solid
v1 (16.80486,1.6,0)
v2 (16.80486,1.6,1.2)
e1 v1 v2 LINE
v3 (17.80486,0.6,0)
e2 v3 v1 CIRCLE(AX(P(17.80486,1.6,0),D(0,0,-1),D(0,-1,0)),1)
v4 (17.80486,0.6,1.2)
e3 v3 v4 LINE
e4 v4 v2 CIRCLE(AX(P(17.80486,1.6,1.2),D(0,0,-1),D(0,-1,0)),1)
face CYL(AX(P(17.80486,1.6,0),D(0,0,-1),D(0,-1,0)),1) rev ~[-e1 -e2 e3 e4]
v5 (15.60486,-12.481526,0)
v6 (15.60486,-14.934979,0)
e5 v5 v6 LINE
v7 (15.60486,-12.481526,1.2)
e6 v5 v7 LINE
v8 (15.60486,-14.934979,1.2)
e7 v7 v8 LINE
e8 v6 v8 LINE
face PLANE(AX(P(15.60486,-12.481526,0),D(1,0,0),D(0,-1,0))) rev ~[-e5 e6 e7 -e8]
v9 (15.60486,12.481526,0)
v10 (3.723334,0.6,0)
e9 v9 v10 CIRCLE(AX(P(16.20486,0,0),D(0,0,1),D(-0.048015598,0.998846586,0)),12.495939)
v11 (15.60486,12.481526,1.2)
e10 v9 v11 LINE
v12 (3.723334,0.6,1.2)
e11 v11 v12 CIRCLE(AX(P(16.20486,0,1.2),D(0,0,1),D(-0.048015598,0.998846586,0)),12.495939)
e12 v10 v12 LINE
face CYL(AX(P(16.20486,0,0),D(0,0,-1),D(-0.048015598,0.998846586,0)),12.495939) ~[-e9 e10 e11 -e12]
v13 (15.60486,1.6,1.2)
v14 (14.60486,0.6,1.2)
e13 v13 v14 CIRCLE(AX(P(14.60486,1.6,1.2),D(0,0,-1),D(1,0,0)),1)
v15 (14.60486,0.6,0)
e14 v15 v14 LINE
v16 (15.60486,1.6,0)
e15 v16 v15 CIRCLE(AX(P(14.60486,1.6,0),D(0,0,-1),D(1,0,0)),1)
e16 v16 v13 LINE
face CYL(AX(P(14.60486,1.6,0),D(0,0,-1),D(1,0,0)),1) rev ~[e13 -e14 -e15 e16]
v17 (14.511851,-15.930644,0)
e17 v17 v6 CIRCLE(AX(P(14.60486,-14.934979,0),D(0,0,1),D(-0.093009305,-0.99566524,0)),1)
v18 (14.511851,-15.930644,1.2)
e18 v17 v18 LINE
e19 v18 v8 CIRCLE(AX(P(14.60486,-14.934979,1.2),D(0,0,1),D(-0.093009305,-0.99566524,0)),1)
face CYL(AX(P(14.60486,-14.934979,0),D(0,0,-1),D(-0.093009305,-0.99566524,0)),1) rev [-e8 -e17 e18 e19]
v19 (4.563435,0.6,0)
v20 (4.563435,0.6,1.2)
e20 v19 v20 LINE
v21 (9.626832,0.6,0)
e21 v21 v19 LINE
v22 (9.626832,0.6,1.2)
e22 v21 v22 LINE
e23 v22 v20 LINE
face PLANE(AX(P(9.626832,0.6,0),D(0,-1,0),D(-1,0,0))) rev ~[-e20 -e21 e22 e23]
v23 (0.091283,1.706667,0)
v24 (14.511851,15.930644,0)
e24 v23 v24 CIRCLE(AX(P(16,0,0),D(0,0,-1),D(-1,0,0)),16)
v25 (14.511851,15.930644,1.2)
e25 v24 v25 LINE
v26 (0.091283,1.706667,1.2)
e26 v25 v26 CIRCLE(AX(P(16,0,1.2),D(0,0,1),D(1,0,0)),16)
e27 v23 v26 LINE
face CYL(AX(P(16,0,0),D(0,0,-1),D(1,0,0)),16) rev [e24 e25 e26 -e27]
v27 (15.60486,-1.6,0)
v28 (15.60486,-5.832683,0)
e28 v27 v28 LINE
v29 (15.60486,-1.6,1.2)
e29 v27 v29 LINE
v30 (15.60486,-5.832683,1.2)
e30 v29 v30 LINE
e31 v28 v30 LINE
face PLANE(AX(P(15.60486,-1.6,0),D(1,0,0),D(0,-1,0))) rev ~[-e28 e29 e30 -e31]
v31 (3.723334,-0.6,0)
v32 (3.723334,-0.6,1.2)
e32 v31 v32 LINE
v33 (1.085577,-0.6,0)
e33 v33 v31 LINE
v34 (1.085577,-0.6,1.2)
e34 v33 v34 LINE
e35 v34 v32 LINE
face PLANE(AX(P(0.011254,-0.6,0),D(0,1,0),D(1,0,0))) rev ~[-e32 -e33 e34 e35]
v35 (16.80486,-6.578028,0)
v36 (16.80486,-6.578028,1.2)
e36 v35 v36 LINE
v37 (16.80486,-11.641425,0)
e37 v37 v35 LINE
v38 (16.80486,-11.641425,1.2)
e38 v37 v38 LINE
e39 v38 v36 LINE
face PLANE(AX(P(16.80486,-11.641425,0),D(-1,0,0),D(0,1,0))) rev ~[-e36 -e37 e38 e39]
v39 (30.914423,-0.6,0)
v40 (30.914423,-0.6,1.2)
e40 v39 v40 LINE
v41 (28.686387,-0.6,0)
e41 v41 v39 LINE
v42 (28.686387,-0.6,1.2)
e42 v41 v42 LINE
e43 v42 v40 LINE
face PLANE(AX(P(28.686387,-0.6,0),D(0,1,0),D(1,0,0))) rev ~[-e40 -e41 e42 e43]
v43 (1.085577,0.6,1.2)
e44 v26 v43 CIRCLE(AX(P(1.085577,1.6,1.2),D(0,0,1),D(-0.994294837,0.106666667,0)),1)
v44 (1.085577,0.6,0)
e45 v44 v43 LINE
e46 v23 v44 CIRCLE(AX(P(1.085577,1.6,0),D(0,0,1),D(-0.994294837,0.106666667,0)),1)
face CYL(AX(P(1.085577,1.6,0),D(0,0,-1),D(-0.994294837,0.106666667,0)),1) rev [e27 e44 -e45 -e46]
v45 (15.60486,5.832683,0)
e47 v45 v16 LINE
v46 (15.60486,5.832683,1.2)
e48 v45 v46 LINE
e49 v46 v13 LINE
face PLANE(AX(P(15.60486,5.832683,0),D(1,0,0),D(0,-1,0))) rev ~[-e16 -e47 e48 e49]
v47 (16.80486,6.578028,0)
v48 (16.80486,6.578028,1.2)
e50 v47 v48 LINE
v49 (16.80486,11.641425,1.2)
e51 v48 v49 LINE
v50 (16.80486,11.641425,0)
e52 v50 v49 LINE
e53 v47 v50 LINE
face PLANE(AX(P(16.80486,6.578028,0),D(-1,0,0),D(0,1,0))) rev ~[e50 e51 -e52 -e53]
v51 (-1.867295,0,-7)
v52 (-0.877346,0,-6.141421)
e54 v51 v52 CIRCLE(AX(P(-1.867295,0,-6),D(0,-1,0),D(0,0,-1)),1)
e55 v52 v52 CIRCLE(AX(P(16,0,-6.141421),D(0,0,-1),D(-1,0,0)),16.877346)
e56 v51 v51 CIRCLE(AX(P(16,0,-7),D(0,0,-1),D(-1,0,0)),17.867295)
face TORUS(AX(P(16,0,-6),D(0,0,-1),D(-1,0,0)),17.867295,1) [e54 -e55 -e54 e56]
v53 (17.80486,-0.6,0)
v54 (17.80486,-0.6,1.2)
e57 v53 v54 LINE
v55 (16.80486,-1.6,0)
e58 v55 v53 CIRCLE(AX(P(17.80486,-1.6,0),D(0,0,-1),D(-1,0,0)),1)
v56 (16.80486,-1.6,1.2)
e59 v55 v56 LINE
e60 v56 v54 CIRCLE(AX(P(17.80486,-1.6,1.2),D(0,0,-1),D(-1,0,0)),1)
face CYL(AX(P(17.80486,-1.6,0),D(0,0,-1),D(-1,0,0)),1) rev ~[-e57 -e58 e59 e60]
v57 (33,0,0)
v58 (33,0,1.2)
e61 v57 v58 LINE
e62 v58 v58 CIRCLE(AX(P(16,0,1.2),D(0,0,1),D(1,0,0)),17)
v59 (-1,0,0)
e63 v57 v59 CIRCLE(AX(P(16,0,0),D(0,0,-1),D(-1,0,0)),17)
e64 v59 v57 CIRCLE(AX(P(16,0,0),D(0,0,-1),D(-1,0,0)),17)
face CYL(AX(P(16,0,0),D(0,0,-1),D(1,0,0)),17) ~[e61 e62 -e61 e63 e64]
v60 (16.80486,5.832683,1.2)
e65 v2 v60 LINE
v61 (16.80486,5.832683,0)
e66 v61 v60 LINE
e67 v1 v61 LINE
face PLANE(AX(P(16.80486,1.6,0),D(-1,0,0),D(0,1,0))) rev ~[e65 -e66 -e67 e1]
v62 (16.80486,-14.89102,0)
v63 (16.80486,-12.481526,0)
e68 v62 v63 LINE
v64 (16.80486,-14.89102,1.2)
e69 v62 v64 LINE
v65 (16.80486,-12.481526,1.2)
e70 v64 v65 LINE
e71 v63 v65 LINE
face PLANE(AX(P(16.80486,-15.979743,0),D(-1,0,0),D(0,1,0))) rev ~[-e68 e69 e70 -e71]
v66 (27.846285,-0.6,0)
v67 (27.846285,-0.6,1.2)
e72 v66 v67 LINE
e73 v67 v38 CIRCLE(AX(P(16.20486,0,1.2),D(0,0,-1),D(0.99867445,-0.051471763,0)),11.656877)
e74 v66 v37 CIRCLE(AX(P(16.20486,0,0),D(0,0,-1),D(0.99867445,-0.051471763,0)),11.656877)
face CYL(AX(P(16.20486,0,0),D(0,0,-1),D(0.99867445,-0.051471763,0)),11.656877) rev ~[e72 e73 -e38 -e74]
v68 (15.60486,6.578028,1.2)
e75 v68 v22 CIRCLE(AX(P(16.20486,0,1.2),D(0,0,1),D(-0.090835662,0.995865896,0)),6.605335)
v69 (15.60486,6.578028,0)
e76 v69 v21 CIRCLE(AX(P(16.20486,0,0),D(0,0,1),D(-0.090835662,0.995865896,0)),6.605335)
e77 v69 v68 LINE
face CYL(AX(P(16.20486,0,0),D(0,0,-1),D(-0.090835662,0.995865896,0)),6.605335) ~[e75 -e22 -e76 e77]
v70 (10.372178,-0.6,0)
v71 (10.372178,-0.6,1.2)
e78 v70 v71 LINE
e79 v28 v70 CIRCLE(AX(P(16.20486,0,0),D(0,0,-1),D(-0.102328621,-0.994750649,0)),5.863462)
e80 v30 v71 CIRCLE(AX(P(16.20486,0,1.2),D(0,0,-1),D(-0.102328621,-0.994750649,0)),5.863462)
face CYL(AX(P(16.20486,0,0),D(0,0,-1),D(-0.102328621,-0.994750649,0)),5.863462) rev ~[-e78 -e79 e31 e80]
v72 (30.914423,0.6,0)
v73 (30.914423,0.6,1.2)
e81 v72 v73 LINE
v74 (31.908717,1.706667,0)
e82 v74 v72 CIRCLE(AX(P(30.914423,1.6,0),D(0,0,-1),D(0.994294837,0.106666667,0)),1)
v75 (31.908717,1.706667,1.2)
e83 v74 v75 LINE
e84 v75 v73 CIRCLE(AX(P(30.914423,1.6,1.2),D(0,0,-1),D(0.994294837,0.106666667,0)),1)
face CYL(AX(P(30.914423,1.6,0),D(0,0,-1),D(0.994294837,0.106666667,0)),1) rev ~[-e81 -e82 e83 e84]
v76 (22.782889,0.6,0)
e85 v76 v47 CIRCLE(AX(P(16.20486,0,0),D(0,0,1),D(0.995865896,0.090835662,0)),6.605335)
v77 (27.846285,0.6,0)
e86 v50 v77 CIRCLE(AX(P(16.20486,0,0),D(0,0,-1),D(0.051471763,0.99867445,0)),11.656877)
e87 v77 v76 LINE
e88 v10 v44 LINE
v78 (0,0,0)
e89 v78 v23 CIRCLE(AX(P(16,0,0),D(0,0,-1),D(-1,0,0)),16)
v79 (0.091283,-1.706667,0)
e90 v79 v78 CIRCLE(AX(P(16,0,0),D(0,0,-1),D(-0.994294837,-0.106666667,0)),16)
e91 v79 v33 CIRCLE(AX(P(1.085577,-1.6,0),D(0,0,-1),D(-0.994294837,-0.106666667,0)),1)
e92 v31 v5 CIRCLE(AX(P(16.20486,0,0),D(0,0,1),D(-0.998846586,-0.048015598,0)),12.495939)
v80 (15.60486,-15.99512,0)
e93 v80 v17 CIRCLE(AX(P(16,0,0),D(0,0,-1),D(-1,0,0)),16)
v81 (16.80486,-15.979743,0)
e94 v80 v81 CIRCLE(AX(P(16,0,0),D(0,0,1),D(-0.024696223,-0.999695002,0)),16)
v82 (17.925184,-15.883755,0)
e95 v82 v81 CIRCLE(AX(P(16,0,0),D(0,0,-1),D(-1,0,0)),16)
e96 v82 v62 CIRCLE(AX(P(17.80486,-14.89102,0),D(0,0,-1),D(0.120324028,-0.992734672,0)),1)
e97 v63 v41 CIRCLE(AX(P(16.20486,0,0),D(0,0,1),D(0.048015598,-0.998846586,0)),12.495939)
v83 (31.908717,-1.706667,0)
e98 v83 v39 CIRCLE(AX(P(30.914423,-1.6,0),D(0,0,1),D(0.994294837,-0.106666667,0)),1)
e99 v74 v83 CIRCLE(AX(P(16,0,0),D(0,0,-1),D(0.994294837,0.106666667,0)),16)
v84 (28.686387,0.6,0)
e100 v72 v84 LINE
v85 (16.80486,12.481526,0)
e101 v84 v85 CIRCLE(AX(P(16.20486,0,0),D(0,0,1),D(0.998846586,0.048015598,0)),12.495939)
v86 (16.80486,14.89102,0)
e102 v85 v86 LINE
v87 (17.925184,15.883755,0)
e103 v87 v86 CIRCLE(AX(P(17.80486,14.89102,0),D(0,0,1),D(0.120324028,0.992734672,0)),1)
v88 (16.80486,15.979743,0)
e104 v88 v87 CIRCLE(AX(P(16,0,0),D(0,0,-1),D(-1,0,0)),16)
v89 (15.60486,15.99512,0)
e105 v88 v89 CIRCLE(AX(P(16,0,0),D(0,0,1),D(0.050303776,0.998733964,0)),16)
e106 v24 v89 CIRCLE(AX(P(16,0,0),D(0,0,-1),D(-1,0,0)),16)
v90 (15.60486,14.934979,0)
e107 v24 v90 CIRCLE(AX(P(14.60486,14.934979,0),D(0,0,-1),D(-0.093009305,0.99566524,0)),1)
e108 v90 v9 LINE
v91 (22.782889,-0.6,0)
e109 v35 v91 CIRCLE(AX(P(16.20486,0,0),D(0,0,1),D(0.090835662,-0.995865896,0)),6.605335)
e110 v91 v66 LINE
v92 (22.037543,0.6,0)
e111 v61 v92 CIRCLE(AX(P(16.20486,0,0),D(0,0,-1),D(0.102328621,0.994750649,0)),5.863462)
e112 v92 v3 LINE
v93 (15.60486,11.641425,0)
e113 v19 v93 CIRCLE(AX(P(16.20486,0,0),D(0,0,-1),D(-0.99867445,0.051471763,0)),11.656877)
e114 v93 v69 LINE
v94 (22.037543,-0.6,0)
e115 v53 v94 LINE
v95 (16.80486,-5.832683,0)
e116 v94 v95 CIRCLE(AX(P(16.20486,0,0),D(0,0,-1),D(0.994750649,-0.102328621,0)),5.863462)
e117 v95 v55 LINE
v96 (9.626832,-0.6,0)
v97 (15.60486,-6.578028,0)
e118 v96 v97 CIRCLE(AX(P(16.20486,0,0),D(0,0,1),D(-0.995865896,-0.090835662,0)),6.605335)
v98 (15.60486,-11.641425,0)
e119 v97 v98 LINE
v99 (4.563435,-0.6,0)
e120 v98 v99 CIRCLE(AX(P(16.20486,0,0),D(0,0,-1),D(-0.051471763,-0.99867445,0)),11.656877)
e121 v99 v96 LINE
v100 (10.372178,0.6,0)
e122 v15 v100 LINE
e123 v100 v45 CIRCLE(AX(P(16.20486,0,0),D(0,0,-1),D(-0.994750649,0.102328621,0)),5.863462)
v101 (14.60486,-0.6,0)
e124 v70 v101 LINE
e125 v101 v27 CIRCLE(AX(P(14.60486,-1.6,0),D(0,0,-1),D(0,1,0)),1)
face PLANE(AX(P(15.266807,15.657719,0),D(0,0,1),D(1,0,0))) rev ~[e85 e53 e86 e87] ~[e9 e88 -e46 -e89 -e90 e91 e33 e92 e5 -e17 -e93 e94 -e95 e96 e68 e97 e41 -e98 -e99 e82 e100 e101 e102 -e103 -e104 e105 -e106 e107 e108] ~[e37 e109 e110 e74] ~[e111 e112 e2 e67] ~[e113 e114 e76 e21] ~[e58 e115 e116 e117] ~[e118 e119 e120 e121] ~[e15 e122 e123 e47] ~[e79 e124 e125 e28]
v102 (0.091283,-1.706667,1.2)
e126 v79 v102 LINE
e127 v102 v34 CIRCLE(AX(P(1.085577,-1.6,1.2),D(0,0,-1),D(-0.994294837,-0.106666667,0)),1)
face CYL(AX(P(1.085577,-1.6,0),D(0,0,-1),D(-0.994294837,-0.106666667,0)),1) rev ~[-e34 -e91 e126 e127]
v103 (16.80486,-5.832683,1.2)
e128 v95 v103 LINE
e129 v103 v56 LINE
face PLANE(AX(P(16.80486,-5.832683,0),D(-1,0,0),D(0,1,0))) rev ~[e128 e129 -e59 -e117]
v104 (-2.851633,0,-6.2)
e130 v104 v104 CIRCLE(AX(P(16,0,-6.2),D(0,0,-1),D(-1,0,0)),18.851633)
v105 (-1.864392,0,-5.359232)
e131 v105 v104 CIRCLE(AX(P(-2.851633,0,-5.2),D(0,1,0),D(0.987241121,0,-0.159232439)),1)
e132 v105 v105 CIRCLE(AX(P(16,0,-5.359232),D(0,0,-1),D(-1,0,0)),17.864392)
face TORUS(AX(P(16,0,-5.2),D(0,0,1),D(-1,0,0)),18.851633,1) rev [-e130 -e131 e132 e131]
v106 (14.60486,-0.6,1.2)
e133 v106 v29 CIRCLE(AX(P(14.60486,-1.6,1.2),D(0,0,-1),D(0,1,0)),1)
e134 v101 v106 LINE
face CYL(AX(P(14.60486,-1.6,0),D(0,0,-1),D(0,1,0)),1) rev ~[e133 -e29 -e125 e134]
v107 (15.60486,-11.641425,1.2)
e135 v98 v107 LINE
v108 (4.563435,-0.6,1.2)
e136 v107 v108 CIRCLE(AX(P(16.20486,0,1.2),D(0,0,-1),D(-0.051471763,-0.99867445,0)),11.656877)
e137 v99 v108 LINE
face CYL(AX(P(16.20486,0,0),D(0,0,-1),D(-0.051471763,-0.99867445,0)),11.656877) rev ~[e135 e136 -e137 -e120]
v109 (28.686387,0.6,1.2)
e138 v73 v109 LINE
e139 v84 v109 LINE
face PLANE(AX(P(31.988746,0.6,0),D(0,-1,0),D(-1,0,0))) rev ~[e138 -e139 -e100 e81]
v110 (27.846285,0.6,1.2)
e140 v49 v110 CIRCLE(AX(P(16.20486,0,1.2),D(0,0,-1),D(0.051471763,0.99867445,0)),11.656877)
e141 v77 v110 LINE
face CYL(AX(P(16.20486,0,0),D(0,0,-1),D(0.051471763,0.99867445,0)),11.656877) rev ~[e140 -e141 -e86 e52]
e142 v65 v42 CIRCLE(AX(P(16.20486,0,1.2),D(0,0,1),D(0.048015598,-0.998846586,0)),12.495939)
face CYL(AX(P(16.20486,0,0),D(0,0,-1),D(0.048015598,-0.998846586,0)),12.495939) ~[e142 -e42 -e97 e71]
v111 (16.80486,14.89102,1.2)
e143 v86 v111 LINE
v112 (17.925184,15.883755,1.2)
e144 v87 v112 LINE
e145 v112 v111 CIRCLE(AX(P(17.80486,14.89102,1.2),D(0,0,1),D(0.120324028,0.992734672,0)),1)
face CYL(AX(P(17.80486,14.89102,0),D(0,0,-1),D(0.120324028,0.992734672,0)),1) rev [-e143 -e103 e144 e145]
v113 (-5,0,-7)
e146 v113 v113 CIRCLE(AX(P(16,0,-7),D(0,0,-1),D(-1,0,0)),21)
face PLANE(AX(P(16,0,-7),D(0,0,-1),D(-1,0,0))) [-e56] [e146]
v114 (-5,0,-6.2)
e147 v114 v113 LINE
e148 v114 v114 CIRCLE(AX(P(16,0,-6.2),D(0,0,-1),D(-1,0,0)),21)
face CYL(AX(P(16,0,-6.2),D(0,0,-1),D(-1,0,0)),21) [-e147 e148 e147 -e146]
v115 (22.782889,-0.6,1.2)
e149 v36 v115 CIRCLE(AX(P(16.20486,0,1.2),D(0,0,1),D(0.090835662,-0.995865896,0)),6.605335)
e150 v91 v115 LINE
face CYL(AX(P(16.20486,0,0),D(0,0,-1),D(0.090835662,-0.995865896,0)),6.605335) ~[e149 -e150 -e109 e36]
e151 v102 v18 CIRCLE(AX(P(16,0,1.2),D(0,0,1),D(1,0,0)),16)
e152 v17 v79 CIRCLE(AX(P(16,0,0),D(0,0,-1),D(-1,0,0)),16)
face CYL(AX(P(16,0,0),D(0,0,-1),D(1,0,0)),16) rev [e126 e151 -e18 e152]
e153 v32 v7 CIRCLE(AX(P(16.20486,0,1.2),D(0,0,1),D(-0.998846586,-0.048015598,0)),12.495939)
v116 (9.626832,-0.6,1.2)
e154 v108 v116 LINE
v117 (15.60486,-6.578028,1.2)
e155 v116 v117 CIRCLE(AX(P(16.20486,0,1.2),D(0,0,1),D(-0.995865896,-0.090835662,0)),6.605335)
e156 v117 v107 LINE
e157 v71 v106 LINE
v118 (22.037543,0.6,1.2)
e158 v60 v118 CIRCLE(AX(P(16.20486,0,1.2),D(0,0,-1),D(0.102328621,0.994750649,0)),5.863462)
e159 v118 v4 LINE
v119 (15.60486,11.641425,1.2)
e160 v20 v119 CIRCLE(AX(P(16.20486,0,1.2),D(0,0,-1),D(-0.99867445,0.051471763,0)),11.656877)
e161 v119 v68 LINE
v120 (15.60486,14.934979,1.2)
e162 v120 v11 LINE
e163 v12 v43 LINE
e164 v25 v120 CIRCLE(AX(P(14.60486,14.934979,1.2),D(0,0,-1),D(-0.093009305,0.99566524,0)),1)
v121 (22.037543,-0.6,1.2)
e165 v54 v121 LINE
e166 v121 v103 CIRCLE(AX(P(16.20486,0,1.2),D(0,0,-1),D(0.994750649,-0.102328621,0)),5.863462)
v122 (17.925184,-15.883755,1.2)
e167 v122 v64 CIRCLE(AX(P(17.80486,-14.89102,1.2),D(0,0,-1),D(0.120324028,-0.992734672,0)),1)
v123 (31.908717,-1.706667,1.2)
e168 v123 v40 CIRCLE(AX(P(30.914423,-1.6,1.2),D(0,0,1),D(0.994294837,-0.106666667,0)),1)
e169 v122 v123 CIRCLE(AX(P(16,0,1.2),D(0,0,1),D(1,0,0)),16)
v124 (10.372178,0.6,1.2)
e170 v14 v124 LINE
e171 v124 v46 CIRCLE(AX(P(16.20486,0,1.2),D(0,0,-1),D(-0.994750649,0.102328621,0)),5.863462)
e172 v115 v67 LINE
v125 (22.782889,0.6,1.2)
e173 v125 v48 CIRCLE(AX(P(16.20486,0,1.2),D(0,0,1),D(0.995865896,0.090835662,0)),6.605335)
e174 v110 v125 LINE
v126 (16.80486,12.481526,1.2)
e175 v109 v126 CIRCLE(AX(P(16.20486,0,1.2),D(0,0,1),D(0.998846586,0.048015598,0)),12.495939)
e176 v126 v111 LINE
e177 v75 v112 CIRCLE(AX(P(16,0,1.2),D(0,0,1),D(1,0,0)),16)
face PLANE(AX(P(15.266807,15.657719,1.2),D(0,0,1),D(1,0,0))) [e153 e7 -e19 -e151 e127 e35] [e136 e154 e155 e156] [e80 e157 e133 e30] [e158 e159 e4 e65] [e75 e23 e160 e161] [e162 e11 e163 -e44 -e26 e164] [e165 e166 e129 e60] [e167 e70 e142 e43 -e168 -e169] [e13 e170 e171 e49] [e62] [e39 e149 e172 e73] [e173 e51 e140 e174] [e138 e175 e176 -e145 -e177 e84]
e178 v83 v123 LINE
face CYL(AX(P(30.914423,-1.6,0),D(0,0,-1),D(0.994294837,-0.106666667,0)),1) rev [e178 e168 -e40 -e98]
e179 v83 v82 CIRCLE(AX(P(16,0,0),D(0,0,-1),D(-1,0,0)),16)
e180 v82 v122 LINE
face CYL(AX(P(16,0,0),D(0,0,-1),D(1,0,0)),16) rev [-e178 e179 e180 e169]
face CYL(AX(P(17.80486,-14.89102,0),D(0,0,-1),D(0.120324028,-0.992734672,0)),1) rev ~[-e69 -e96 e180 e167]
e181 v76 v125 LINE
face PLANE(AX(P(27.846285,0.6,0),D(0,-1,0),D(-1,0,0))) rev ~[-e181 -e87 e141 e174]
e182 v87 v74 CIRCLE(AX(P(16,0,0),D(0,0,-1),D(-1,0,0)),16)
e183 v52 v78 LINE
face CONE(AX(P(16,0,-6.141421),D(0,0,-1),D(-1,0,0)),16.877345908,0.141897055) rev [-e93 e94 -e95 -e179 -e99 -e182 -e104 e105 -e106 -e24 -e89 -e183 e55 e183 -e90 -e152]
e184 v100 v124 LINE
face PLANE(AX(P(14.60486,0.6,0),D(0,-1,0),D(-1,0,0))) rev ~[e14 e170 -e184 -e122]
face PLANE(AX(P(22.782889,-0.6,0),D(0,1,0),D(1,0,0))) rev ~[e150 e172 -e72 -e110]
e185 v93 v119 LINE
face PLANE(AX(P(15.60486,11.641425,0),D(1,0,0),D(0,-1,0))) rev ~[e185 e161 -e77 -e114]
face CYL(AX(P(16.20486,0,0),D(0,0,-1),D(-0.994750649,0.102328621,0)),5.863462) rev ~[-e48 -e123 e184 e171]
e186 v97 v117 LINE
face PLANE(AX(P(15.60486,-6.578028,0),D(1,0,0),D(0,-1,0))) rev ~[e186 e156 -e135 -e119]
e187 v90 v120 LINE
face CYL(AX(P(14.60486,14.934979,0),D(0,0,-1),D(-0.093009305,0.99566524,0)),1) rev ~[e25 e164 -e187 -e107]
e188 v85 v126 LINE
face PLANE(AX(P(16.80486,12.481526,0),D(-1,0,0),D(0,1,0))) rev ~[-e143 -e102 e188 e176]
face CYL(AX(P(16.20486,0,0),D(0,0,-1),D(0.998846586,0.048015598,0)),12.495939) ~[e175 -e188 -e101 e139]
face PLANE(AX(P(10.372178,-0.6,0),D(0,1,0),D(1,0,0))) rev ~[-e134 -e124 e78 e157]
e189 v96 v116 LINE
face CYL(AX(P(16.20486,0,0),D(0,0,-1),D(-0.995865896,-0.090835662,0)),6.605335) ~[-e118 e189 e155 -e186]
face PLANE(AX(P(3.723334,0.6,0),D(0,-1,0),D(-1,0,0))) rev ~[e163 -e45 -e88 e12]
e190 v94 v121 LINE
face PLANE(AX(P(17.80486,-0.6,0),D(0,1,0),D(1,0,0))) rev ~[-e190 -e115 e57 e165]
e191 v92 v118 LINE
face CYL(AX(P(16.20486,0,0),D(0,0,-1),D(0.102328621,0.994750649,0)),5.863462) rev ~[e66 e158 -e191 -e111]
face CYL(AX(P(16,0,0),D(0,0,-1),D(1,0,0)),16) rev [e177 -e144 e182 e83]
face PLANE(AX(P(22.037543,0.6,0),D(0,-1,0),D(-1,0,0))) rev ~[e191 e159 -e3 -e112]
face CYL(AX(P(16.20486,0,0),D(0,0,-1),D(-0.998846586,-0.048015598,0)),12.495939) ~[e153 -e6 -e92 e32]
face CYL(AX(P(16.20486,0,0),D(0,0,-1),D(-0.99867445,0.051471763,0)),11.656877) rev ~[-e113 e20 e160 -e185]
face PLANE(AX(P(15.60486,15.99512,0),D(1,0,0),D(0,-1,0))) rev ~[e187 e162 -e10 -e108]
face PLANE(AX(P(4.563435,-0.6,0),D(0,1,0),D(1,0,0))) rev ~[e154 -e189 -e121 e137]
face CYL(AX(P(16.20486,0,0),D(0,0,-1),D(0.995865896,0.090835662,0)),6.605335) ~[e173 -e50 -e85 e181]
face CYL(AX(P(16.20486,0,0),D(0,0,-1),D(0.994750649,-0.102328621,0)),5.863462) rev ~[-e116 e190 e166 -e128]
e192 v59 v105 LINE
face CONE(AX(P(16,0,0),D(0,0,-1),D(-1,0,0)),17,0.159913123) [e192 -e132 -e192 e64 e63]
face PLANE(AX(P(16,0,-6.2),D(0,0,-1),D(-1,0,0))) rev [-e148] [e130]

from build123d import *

# Parameters (mm, degrees)
F1_FACE_R   = 17
F1_FACE_R_2 = 16
F3_DEPTH    = 1.2
F4_T1_DEPTH = 1.2


# Not quite as in the source:
# - a fillet or chamfer that OpenCascade refuses, or shapes differently, is made with other operations: its cross-section is extruded or revolved along the edge and cut away or added


with BuildPart() as f1:
    # F0 (on Front) → F1 (revolve)
    with BuildSketch(Plane.XZ):
        with BuildLine():
            Line((-5, -6.2), (-5, -7))
            Line((-5, -7), (-1.8672954017, -7))
            ThreePointArc((-1.8672954017, -7), (-1.2120936603, -6.755453955), (-0.877345908, -6.1414213562))
            Line((-0.877345908, -6.1414213562), (0, 0))
            Line((0, 0), (-1, 0))
            Line((-1, 0), (-1.8643923288, -5.3592324388))
            ThreePointArc((-1.8643923288, -5.3592324388), (-2.2032633542, -5.9613253046), (-2.8516334496, -6.2))
            Line((-2.8516334496, -6.2), (-5, -6.2))
        make_face()
    revolve(axis=Axis((16, 0, -3.4995676855), (0, 0, -1)))

    # F1_face (on face) + F2 (on Top) → F3 (join)
    with BuildSketch(Plane(origin=(16, 0, 0), x_dir=(1, 0, 0), z_dir=(0, 0, 1))):
        Circle(F1_FACE_R)
        Circle(F1_FACE_R_2, mode=Mode.SUBTRACT)
    with BuildSketch(Plane.XY):
        with BuildLine():
            Line((3.7233340059, 0.6), (0.0112539579, 0.6))
            ThreePointArc((0.0112539579, 0.6), (0, 0), (0.0112539579, -0.6))
            Line((0.0112539579, -0.6), (3.7233340059, -0.6))
            ThreePointArc((3.7233340059, -0.6), (7.3688969309, -8.8359634953), (15.6048604261, -12.4815264202))
            Line((15.6048604261, -12.4815264202), (15.6048604261, -15.9951200282))
            ThreePointArc((15.6048604261, -15.9951200282), (16.2050046444, -15.9986866053), (16.8048604261, -15.9797434177))
            Line((16.8048604261, -15.9797434177), (16.8048604261, -12.4815264202))
            ThreePointArc((16.8048604261, -12.4815264202), (25.0408239214, -8.8359634953), (28.6863868464, -0.6))
            Line((28.6863868464, -0.6), (31.9887460421, -0.6))
            ThreePointArc((31.9887460421, -0.6), (31.9971862631, -0.3000527668), (32, 0))
            ThreePointArc((32, 0), (31.9971862631, 0.3000527668), (31.9887460421, 0.6))
            Line((31.9887460421, 0.6), (28.6863868464, 0.6))
            ThreePointArc((28.6863868464, 0.6), (25.0408239214, 8.8359634953), (16.8048604261, 12.4815264202))
            Line((16.8048604261, 12.4815264202), (16.8048604261, 15.9797434177))
            ThreePointArc((16.8048604261, 15.9797434177), (16.2050046444, 15.9986866053), (15.6048604261, 15.9951200282))
            Line((15.6048604261, 15.9951200282), (15.6048604261, 12.4815264202))
            ThreePointArc((15.6048604261, 12.4815264202), (7.3688969309, 8.8359634953), (3.7233340059, 0.6))
        make_face()
        with BuildLine():
            ThreePointArc((15.6048604261, -11.6414250608), (7.9622037717, -8.2426566544), (4.5634353654, -0.6))
            Line((4.5634353654, -0.6), (9.6268322864, -0.6))
            ThreePointArc((9.6268322864, -0.6), (11.5341830552, -4.6706773709), (15.6048604261, -6.5780281397))
            Line((15.6048604261, -6.5780281397), (15.6048604261, -11.6414250608))
        make_face(mode=Mode.SUBTRACT)
        with BuildLine():
            ThreePointArc((15.6048604261, -5.8326828273), (12.0587665437, -4.1460938824), (10.3721775989, -0.6))
            Line((10.3721775989, -0.6), (14.6048604261, -0.6))
            ThreePointArc((14.6048604261, -0.6), (15.3119672073, -0.8928932188), (15.6048604261, -1.6))
            Line((15.6048604261, -1.6), (15.6048604261, -5.8326828273))
        make_face(mode=Mode.SUBTRACT)
        with BuildLine():
            ThreePointArc((16.8048604261, -6.5780281397), (20.875537797, -4.6706773709), (22.7828885658, -0.6))
            Line((22.7828885658, -0.6), (27.8462854869, -0.6))
            ThreePointArc((27.8462854869, -0.6), (24.4475170805, -8.2426566544), (16.8048604261, -11.6414250608))
            Line((16.8048604261, -11.6414250608), (16.8048604261, -6.5780281397))
        make_face(mode=Mode.SUBTRACT)
        with BuildLine():
            ThreePointArc((22.0375432534, -0.6), (20.3509543085, -4.1460938824), (16.8048604261, -5.8326828273))
            Line((16.8048604261, -5.8326828273), (16.8048604261, -1.6))
            ThreePointArc((16.8048604261, -1.6), (17.0977536449, -0.8928932188), (17.8048604261, -0.6))
            Line((17.8048604261, -0.6), (22.0375432534, -0.6))
        make_face(mode=Mode.SUBTRACT)
        with BuildLine():
            ThreePointArc((10.3721775989, 0.6), (12.0587665437, 4.1460938824), (15.6048604261, 5.8326828273))
            Line((15.6048604261, 5.8326828273), (15.6048604261, 1.6))
            ThreePointArc((15.6048604261, 1.6), (15.3119672073, 0.8928932188), (14.6048604261, 0.6))
            Line((14.6048604261, 0.6), (10.3721775989, 0.6))
        make_face(mode=Mode.SUBTRACT)
        with BuildLine():
            ThreePointArc((4.5634353654, 0.6), (7.9622037717, 8.2426566544), (15.6048604261, 11.6414250608))
            Line((15.6048604261, 11.6414250608), (15.6048604261, 6.5780281397))
            ThreePointArc((15.6048604261, 6.5780281397), (11.5341830552, 4.6706773709), (9.6268322864, 0.6))
            Line((9.6268322864, 0.6), (4.5634353654, 0.6))
        make_face(mode=Mode.SUBTRACT)
        with BuildLine():
            Line((16.8048604261, 1.6), (16.8048604261, 5.8326828273))
            ThreePointArc((16.8048604261, 5.8326828273), (20.3509543085, 4.1460938824), (22.0375432534, 0.6))
            Line((22.0375432534, 0.6), (17.8048604261, 0.6))
            ThreePointArc((17.8048604261, 0.6), (17.0977536449, 0.8928932188), (16.8048604261, 1.6))
        make_face(mode=Mode.SUBTRACT)
        with BuildLine():
            Line((16.8048604261, 6.5780281397), (16.8048604261, 11.6414250608))
            ThreePointArc((16.8048604261, 11.6414250608), (24.4475170805, 8.2426566544), (27.8462854869, 0.6))
            Line((27.8462854869, 0.6), (22.7828885658, 0.6))
            ThreePointArc((22.7828885658, 0.6), (20.875537797, 4.6706773709), (16.8048604261, 6.5780281397))
        make_face(mode=Mode.SUBTRACT)
    extrude(amount=F3_DEPTH)

    # F4: fillet of radius 1 on 8 edges, made by hand

    # F4_s2 → F4_t1 (join)
    with BuildSketch(Plane.XY):
        with BuildLine():
            ThreePointArc((14.5118511212, 15.9306438324), (15.2782810581, 15.6742381227), (15.6048604261, 14.9349785929))
            Line((15.6048604261, 14.9349785929), (15.6048604261, 15.9951200282))
            ThreePointArc((15.6048604261, 15.9951200282), (15.0578040841, 15.9722342475), (14.5118511212, 15.9306438324))
        make_face()
        with BuildLine():
            ThreePointArc((17.9251844545, 15.8837547455), (17.1416576021, 15.6394597938), (16.8048604261, 14.8910200739))
            Line((16.8048604261, 14.8910200739), (16.8048604261, 15.9797434177))
            ThreePointArc((16.8048604261, 15.9797434177), (17.3658659227, 15.9415937184), (17.9251844545, 15.8837547455))
        make_face()
        with BuildLine():
            ThreePointArc((31.9087173867, -1.7066666667), (31.6582863368, -0.9316687448), (30.91442255, -0.6))
            Line((30.91442255, -0.6), (31.9887460421, -0.6))
            ThreePointArc((31.9887460421, -0.6), (31.9583276403, -1.1540272632), (31.9087173867, -1.7066666667))
        make_face()
        with BuildLine():
            ThreePointArc((31.9087173867, 1.7066666667), (31.6582863368, 0.9316687448), (30.91442255, 0.6))
            Line((30.91442255, 0.6), (31.9887460421, 0.6))
            ThreePointArc((31.9887460421, 0.6), (31.9583276403, 1.1540272632), (31.9087173867, 1.7066666667))
        make_face()
        with BuildLine():
            ThreePointArc((14.5118511212, -15.9306438324), (15.2782810581, -15.6742381227), (15.6048604261, -14.9349785929))
            Line((15.6048604261, -14.9349785929), (15.6048604261, -15.9951200282))
            ThreePointArc((15.6048604261, -15.9951200282), (15.0578040841, -15.9722342475), (14.5118511212, -15.9306438324))
        make_face()
        with BuildLine():
            ThreePointArc((17.9251844545, -15.8837547455), (17.1416576021, -15.6394597938), (16.8048604261, -14.8910200739))
            Line((16.8048604261, -14.8910200739), (16.8048604261, -15.9797434177))
            ThreePointArc((16.8048604261, -15.9797434177), (17.3658659227, -15.9415937184), (17.9251844545, -15.8837547455))
        make_face()
        with BuildLine():
            ThreePointArc((0.0912826133, 1.7066666667), (0.3417136632, 0.9316687448), (1.08557745, 0.6))
            Line((1.08557745, 0.6), (0.0112539579, 0.6))
            ThreePointArc((0.0112539579, 0.6), (0.0416723597, 1.1540272632), (0.0912826133, 1.7066666667))
        make_face()
        with BuildLine():
            ThreePointArc((0.0912826133, -1.7066666667), (0.3417136632, -0.9316687448), (1.08557745, -0.6))
            Line((1.08557745, -0.6), (0.0112539579, -0.6))
            ThreePointArc((0.0112539579, -0.6), (0.0416723597, -1.1540272632), (0.0912826133, -1.7066666667))
        make_face()
    extrude(amount=F4_T1_DEPTH)


solid = f1.part
